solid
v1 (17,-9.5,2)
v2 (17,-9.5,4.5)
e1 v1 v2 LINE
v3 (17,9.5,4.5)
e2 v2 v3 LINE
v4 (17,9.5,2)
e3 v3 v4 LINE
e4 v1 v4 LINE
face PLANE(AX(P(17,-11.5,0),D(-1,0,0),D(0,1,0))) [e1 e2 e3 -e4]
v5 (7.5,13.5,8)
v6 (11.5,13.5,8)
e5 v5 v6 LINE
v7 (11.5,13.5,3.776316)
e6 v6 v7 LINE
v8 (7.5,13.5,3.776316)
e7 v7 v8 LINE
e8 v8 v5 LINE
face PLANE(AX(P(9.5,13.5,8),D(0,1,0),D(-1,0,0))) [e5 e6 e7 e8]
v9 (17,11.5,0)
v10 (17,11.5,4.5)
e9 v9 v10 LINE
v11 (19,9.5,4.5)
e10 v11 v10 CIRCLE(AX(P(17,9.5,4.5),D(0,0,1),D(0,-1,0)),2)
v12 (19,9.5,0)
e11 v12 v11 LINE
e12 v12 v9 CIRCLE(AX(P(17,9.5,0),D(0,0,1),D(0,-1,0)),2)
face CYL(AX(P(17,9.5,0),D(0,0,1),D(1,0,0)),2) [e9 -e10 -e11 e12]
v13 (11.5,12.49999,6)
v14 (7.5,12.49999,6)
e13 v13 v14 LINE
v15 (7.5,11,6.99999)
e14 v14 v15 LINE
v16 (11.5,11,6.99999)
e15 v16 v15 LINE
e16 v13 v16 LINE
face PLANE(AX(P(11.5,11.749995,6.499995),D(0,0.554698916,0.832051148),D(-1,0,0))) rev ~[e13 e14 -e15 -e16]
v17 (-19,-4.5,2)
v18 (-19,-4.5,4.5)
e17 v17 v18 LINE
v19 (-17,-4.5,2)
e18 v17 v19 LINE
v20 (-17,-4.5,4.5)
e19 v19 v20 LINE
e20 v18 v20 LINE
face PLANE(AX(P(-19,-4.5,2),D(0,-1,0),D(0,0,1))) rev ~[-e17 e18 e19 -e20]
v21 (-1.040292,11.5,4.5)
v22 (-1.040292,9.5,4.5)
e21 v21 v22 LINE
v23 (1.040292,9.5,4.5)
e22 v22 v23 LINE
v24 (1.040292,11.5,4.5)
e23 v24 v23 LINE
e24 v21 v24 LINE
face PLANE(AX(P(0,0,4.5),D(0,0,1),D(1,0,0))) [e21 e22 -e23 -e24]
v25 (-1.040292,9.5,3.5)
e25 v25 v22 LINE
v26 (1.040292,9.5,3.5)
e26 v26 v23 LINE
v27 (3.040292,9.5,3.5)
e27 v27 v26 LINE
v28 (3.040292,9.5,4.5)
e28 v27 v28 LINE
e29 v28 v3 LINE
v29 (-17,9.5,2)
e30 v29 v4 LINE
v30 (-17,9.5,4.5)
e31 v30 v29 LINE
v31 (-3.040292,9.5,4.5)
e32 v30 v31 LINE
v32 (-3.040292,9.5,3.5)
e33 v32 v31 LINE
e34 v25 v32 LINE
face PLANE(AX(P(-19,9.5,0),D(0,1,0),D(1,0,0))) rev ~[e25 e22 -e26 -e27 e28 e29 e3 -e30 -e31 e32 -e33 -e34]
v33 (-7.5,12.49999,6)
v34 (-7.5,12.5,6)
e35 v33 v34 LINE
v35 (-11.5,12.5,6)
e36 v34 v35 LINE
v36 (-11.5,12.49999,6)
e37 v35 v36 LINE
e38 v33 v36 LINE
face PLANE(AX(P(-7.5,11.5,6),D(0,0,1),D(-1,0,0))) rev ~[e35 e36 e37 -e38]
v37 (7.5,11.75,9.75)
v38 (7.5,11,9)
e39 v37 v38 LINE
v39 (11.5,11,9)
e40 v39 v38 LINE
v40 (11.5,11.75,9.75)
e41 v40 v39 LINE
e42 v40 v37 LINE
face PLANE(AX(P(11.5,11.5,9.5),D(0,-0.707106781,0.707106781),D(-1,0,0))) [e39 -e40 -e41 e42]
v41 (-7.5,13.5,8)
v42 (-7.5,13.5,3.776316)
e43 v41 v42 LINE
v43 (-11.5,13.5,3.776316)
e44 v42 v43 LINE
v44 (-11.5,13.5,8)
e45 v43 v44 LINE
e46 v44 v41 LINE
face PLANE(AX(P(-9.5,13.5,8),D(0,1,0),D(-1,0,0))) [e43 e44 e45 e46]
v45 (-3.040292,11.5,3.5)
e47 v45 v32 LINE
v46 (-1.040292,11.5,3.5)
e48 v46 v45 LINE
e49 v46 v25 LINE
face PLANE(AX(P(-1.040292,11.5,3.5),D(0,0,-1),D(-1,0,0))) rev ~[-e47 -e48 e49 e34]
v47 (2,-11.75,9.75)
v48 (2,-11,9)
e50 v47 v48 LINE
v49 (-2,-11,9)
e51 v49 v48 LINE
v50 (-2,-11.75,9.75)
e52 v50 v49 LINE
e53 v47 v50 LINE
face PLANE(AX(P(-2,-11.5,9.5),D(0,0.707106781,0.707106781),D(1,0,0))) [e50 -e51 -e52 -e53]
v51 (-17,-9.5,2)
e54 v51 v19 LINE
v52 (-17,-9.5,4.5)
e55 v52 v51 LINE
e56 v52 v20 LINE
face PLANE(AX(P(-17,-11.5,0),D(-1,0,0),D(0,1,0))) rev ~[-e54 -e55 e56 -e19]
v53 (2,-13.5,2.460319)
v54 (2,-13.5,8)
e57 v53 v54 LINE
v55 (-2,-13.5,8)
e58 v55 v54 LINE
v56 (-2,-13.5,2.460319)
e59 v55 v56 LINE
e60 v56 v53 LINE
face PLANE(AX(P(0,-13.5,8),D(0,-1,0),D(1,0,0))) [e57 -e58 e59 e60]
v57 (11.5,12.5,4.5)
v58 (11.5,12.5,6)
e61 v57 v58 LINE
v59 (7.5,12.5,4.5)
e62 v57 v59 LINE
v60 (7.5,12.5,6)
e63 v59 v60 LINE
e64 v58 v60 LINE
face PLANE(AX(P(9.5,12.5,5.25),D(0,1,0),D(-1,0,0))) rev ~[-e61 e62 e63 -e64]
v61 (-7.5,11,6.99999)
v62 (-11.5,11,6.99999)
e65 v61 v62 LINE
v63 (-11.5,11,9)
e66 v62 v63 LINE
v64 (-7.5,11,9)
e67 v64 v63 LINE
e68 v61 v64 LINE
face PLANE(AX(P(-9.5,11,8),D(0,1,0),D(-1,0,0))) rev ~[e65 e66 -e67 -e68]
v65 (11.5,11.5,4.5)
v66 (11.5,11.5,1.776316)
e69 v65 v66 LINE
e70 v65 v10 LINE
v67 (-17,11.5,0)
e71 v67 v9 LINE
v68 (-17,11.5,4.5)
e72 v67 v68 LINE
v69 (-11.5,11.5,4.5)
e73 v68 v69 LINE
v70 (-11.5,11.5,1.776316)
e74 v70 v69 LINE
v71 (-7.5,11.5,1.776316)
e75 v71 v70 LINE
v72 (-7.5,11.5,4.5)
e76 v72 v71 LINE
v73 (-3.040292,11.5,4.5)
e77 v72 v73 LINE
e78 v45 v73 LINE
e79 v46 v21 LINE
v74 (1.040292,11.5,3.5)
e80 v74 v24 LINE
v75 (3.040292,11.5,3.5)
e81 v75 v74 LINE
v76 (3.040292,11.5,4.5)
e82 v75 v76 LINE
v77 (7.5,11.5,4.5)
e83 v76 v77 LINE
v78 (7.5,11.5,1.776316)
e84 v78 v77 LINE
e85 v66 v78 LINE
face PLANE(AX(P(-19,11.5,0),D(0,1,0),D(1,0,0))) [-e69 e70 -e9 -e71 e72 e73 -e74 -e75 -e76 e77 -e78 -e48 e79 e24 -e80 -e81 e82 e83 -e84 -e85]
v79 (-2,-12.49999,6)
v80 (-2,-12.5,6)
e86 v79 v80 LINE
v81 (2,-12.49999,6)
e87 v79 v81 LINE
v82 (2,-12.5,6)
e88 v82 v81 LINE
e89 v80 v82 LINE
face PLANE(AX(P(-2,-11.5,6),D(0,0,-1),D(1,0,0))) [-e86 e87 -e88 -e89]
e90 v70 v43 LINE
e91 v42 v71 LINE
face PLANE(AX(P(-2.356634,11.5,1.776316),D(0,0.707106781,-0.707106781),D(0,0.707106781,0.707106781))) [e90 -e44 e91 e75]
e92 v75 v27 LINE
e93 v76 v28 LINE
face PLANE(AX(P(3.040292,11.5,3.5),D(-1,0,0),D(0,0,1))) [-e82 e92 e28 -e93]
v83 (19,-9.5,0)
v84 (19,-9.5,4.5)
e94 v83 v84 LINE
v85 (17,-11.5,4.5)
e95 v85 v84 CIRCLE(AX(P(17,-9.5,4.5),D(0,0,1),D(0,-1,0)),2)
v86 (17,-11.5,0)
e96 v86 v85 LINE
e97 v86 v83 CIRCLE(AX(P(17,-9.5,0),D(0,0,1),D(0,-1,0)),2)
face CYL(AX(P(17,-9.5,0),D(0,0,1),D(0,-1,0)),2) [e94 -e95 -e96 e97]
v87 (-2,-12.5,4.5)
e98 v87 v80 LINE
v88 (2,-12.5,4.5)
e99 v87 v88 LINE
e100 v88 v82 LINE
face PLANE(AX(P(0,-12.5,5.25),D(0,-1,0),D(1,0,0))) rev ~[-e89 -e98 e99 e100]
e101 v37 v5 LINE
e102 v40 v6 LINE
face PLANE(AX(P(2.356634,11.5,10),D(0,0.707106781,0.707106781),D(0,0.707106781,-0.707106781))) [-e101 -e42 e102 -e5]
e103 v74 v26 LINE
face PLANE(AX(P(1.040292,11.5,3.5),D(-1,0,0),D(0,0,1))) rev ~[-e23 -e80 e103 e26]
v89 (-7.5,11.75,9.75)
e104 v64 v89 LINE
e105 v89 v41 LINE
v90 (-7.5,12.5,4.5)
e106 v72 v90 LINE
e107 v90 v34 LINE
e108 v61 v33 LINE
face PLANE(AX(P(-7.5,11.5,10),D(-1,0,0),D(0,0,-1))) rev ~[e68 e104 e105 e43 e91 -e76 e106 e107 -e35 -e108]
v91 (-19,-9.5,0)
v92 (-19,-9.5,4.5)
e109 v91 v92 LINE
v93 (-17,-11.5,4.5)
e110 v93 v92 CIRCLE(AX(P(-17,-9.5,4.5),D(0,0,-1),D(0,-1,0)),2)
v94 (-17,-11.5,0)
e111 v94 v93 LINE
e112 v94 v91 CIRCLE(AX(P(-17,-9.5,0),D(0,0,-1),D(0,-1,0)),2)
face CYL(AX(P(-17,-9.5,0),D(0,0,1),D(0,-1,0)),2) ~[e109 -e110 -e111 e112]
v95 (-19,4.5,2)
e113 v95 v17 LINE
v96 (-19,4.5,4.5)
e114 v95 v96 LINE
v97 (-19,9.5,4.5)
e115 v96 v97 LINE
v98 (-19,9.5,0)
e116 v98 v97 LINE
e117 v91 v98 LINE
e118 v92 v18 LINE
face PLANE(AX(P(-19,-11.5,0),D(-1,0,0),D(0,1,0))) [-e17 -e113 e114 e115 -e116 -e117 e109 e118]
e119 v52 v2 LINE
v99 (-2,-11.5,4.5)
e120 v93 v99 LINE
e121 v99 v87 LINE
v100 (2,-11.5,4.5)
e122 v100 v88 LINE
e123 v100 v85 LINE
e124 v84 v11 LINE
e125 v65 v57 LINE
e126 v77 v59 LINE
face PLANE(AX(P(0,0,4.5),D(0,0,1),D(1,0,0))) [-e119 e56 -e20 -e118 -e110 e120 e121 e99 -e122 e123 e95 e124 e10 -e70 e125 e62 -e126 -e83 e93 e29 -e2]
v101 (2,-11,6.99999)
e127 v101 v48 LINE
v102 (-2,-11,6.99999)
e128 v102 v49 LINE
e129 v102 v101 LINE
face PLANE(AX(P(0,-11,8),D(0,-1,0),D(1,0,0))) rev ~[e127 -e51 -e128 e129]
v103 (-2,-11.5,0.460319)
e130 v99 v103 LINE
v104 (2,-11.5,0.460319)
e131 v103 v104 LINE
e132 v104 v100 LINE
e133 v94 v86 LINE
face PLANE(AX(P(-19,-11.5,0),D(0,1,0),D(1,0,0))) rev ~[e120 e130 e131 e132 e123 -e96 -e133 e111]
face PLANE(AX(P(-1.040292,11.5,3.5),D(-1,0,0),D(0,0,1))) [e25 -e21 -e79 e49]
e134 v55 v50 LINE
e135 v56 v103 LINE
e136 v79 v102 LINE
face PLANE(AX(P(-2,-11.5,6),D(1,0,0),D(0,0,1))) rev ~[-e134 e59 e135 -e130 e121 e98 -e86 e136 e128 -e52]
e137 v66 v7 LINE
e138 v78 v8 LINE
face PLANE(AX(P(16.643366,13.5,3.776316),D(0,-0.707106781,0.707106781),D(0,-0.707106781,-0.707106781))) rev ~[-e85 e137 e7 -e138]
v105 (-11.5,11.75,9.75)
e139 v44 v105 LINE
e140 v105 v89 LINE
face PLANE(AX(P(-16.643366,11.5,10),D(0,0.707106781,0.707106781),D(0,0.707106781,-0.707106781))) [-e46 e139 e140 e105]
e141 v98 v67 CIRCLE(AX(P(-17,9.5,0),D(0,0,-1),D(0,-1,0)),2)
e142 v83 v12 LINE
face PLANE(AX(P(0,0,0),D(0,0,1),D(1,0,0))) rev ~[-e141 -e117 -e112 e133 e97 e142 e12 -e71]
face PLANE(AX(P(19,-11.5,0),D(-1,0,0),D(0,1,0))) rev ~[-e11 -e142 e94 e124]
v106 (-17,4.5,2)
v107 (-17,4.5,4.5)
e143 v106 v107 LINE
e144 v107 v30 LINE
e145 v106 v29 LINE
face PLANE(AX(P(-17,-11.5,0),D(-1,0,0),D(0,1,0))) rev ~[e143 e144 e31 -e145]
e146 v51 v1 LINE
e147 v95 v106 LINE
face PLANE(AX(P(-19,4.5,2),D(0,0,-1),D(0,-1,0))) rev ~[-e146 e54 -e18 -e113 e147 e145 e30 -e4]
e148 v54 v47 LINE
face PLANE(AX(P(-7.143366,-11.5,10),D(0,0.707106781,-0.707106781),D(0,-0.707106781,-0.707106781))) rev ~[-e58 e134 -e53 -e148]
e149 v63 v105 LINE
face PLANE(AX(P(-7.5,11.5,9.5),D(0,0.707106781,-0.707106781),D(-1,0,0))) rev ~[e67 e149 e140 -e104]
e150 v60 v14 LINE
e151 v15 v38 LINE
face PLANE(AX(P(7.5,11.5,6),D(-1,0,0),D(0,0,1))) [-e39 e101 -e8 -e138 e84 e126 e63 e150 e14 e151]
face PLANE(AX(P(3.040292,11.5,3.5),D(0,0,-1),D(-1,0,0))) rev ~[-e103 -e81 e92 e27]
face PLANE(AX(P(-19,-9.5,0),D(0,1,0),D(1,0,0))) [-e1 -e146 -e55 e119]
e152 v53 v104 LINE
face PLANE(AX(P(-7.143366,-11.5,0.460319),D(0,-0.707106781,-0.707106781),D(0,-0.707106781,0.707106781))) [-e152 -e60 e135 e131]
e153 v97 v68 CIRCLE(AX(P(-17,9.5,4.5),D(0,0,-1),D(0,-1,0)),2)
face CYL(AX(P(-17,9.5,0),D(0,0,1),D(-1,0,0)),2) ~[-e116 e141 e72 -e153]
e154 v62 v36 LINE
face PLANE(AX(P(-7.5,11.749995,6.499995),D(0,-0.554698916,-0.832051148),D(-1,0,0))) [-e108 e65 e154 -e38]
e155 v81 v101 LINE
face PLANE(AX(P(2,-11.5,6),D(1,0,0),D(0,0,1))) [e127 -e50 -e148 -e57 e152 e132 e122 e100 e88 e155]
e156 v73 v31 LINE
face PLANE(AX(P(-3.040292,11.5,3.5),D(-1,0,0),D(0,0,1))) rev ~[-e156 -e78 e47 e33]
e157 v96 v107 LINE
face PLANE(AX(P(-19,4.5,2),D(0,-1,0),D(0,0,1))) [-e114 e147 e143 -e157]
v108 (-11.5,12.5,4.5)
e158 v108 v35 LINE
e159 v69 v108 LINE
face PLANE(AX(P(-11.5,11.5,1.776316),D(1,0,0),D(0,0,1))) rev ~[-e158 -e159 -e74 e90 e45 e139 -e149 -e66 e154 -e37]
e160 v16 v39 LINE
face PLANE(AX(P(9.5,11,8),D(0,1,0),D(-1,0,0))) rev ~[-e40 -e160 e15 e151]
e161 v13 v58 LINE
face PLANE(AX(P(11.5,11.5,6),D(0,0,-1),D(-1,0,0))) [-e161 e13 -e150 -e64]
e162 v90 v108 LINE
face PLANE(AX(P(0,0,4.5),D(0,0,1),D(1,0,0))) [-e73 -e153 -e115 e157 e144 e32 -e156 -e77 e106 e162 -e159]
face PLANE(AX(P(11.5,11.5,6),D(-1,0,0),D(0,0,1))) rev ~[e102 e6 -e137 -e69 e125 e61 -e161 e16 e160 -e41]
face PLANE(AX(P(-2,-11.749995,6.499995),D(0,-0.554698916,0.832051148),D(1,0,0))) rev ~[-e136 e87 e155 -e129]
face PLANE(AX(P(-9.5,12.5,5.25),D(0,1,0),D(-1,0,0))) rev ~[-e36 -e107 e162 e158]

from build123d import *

# Parameters (mm, degrees)
F0_W          = 38
F0_H          = 23
F1_DEPTH      = 4.5
F2_T          = -2
F3_W          = 9
F3_H          = 2.5
F4_DEPTH      = 2
F5_W          = 2
F5_H          = 1
F6_DEPTH      = 2
F7_W          = 4
F7_H          = 4
F7_H_2        = 4.2236842105
F8_DEPTH      = 2
F9_DEPTH      = 0.5
F10_W         = 4
F10_H         = 4
F10_H_2       = 5.5396806626
F11_DEPTH     = 2
F12_DEPTH     = 0.5
F13_SIZE2     = 1
F13_SIZE      = 1
F14_T1_DEPTH  = 14.2867319519
F14_T3_DEPTH  = 14.2867319519
F14_T5_DEPTH  = 14.2867319519
F14_T10_DEPTH = 14.2867319519
F14_T15_DEPTH = 14.2867319519
F14_T20_DEPTH = 14.2867319519
F15_R         = 2
F10_H_3       = 1.5
F16_DEPTH     = 1
F7_H_3        = 1.5
F17_DEPTH     = 1
F18_SIZE2     = 0.99999
F18_SIZE      = 1.49999
F19_SIZE2     = 1.49999
F19_SIZE      = 0.99999
F20_SIZE2     = 0.99999
F20_SIZE      = 1.49999


# Not quite as in the source:
# - a fillet or chamfer that OpenCascade refuses, or shapes differently, is made with other operations: its cross-section is extruded or revolved along the edge and cut away or added
# - a fillet or chamfer is up to 0.001 mm smaller than in the source, because OpenCascade refuses the exact size


with BuildPart() as f1:
    # F0 (on Top) → F1 (new body)
    with BuildSketch(Plane.XY):
        Rectangle(F0_W, F0_H)
    extrude(amount=F1_DEPTH)

    # F2
    f2_openings = [f1.faces().sort_by_distance(p)[0] for p in [
        (0, 0, 4.5),
    ]]
    offset(amount=F2_T, openings=f2_openings)

    # F3 (on face) → F4 (cut, through all)
    with BuildSketch(Plane(origin=(-19, 0, 0), x_dir=(0, -1, 0), z_dir=(-1, 0, 0))):
        with Locations((0, 3.25)):
            Rectangle(F3_W, F3_H)
    extrude(amount=-F4_DEPTH, mode=Mode.SUBTRACT)

    # F5 (on face) → F6 (cut, through all)
    with BuildSketch(Plane(origin=(0, 11.5, 0), x_dir=(-1, 0, 0), z_dir=(0, 1, 0))):
        with Locations((-2.0402920675, 4)):
            Rectangle(F5_W, F5_H)
        with Locations((2.0402920675, 4)):
            Rectangle(F5_W, F5_H)
    extrude(amount=-F6_DEPTH, mode=Mode.SUBTRACT)

    # F7 (on face) → F8 (join)
    with BuildSketch(Plane(origin=(0, 11.5, 0), x_dir=(-1, 0, 0), z_dir=(0, 1, 0))):
        with Locations((-9.5, 8)):
            Rectangle(F7_W, F7_H)
        with Locations((-9.5, 3.8881578947)):
            Rectangle(F7_W, F7_H_2)
        with Locations((9.5, 8)):
            Rectangle(F7_W, F7_H)
        with Locations((9.5, 3.8881578947)):
            Rectangle(F7_W, F7_H_2)
    extrude(amount=F8_DEPTH)

    # F7 (on face) → F9 (join)
    with BuildSketch(Plane(origin=(0, 11.5, 0), x_dir=(-1, 0, 0), z_dir=(0, 1, 0))):
        with Locations((-9.5, 8)):
            Rectangle(F7_W, F7_H)
        with Locations((9.5, 8)):
            Rectangle(F7_W, F7_H)
    extrude(amount=-F9_DEPTH)

    # F10 (on face) → F11 (join)
    with BuildSketch(Plane.XZ.offset(11.5)):
        with Locations((0, 8)):
            Rectangle(F10_W, F10_H)
        with Locations((0, 3.2301596687)):
            Rectangle(F10_W, F10_H_2)
    extrude(amount=F11_DEPTH)

    # F10 (on face) → F12 (join)
    with BuildSketch(Plane.XZ.offset(11.5)):
        with Locations((0, 8)):
            Rectangle(F10_W, F10_H)
    extrude(amount=-F12_DEPTH)

    # F13
    f13_edges = [f1.edges().sort_by_distance(p)[0] for p in [
        (0, -11, 10),
        (-9.5, 11, 10),
        (9.5, 11, 10),
    ]]
    chamfer(f13_edges, length=F13_SIZE, length2=F13_SIZE2)

    # F14: chamfer of 2 on 6 edges, made by hand

    # F14_s2 → F14_t1 (cut)
    with BuildSketch(Plane.YZ.offset(2.3566340241)):
        Polygon((11.5, 10), (13.5, 8), (13.5, 10), align=None)
    extrude(amount=F14_T1_DEPTH, mode=Mode.SUBTRACT)

    # F14_s4 → F14_t3 (cut)
    with BuildSketch(Plane.YZ.offset(-16.6433659759)):
        Polygon((11.5, 10), (13.5, 8), (13.5, 10), align=None)
    extrude(amount=F14_T3_DEPTH, mode=Mode.SUBTRACT)

    # F14_s6 → F14_t5 (cut)
    with BuildSketch(Plane.YZ.offset(-7.1433659759)):
        Polygon((-11.5, 10), (-13.5, 8), (-13.5, 10), align=None)
    extrude(amount=F14_T5_DEPTH, mode=Mode.SUBTRACT)


with BuildPart() as f14_tool8:
    # F14_s9 → F14_t10 (new body)
    with BuildSketch(Plane.YZ.offset(-2.3566340241)):
        Polygon((11.5, 1.7763157895), (13.5, 3.7763157895), (13.5, 1.7763157895), align=None)
    extrude(amount=-F14_T10_DEPTH)

    split(bisect_by=Plane.XZ.offset(-11.5), keep=Keep.BOTTOM)


with BuildPart() as f1_1:
    add(f1.part)

    # F14_t7: cut F14_tool8
    add(f14_tool8.part, mode=Mode.SUBTRACT)


with BuildPart() as f14_tool13:
    # F14_s14 → F14_t15 (new body)
    with BuildSketch(Plane.YZ.offset(16.6433659759)):
        Polygon((13.5, 3.7763157895), (11.5, 1.7763157895), (13.5, 1.7763157895), align=None)
    extrude(amount=-F14_T15_DEPTH)

    split(bisect_by=Plane.XZ.offset(-11.5), keep=Keep.BOTTOM)


with BuildPart() as f1_2:
    add(f1_1.part)

    # F14_t12: cut F14_tool13
    add(f14_tool13.part, mode=Mode.SUBTRACT)


with BuildPart() as f14_tool18:
    # F14_s19 → F14_t20 (new body)
    with BuildSketch(Plane.YZ.offset(-7.1433659759)):
        Polygon((-11.5, 0.4603193374), (-13.5, 2.4603193374), (-13.5, 0.4603193374), align=None)
    extrude(amount=F14_T20_DEPTH)

    split(bisect_by=Plane.XZ.offset(11.5), keep=Keep.TOP)


with BuildPart() as f1_3:
    add(f1_2.part)

    # F14_t17: cut F14_tool18
    add(f14_tool18.part, mode=Mode.SUBTRACT)

    # F15
    f15_edges = [f1_3.edges().sort_by_distance(p)[0] for p in [
        (19, -11.5, 2.25),
        (19, 11.5, 2.25),
        (-19, 11.5, 2.25),
        (-19, -11.5, 2.25),
    ]]
    fillet(f15_edges, radius=F15_R)

    # F10 (on face) → F16 (cut)
    with BuildSketch(Plane.XZ.offset(11.5)):
        with Locations((0, 5.25)):
            Rectangle(F10_W, F10_H_3)
    extrude(amount=F16_DEPTH, mode=Mode.SUBTRACT)

    # F7 (on face) → F17 (cut)
    with BuildSketch(Plane(origin=(0, 11.5, 0), x_dir=(-1, 0, 0), z_dir=(0, 1, 0))):
        with Locations((9.5, 5.25)):
            Rectangle(F7_W, F7_H_3)
        with Locations((-9.5, 5.25)):
            Rectangle(F7_W, F7_H_3)
    extrude(amount=F17_DEPTH, mode=Mode.SUBTRACT)

    # F18 (size 1.5 and 1 in the source; OpenCascade refuses exactly that, so slightly less here)
    f18_edges = [f1_3.edges().sort_by_distance(p)[0] for p in [
        (0, -11, 6),
    ]]
    f18_side = f1_3.faces().sort_by_distance((0, -11.75, 6))[0]
    chamfer(f18_edges, length=F18_SIZE, length2=F18_SIZE2, reference=f18_side)

    # F19 (size 1 and 1.5 in the source; OpenCascade refuses exactly that, so slightly less here)
    f19_edges = [f1_3.edges().sort_by_distance(p)[0] for p in [
        (-9.5, 11, 6),
    ]]
    f19_side = f1_3.faces().sort_by_distance((-9.5, 11, 7.5))[0]
    chamfer(f19_edges, length=F19_SIZE, length2=F19_SIZE2, reference=f19_side)

    # F20 (size 1.5 and 1 in the source; OpenCascade refuses exactly that, so slightly less here)
    f20_edges = [f1_3.edges().sort_by_distance(p)[0] for p in [
        (9.5, 11, 6),
    ]]
    f20_side = f1_3.faces().sort_by_distance((9.5, 11.75, 6))[0]
    chamfer(f20_edges, length=F20_SIZE, length2=F20_SIZE2, reference=f20_side)


solid = f1_3.part
